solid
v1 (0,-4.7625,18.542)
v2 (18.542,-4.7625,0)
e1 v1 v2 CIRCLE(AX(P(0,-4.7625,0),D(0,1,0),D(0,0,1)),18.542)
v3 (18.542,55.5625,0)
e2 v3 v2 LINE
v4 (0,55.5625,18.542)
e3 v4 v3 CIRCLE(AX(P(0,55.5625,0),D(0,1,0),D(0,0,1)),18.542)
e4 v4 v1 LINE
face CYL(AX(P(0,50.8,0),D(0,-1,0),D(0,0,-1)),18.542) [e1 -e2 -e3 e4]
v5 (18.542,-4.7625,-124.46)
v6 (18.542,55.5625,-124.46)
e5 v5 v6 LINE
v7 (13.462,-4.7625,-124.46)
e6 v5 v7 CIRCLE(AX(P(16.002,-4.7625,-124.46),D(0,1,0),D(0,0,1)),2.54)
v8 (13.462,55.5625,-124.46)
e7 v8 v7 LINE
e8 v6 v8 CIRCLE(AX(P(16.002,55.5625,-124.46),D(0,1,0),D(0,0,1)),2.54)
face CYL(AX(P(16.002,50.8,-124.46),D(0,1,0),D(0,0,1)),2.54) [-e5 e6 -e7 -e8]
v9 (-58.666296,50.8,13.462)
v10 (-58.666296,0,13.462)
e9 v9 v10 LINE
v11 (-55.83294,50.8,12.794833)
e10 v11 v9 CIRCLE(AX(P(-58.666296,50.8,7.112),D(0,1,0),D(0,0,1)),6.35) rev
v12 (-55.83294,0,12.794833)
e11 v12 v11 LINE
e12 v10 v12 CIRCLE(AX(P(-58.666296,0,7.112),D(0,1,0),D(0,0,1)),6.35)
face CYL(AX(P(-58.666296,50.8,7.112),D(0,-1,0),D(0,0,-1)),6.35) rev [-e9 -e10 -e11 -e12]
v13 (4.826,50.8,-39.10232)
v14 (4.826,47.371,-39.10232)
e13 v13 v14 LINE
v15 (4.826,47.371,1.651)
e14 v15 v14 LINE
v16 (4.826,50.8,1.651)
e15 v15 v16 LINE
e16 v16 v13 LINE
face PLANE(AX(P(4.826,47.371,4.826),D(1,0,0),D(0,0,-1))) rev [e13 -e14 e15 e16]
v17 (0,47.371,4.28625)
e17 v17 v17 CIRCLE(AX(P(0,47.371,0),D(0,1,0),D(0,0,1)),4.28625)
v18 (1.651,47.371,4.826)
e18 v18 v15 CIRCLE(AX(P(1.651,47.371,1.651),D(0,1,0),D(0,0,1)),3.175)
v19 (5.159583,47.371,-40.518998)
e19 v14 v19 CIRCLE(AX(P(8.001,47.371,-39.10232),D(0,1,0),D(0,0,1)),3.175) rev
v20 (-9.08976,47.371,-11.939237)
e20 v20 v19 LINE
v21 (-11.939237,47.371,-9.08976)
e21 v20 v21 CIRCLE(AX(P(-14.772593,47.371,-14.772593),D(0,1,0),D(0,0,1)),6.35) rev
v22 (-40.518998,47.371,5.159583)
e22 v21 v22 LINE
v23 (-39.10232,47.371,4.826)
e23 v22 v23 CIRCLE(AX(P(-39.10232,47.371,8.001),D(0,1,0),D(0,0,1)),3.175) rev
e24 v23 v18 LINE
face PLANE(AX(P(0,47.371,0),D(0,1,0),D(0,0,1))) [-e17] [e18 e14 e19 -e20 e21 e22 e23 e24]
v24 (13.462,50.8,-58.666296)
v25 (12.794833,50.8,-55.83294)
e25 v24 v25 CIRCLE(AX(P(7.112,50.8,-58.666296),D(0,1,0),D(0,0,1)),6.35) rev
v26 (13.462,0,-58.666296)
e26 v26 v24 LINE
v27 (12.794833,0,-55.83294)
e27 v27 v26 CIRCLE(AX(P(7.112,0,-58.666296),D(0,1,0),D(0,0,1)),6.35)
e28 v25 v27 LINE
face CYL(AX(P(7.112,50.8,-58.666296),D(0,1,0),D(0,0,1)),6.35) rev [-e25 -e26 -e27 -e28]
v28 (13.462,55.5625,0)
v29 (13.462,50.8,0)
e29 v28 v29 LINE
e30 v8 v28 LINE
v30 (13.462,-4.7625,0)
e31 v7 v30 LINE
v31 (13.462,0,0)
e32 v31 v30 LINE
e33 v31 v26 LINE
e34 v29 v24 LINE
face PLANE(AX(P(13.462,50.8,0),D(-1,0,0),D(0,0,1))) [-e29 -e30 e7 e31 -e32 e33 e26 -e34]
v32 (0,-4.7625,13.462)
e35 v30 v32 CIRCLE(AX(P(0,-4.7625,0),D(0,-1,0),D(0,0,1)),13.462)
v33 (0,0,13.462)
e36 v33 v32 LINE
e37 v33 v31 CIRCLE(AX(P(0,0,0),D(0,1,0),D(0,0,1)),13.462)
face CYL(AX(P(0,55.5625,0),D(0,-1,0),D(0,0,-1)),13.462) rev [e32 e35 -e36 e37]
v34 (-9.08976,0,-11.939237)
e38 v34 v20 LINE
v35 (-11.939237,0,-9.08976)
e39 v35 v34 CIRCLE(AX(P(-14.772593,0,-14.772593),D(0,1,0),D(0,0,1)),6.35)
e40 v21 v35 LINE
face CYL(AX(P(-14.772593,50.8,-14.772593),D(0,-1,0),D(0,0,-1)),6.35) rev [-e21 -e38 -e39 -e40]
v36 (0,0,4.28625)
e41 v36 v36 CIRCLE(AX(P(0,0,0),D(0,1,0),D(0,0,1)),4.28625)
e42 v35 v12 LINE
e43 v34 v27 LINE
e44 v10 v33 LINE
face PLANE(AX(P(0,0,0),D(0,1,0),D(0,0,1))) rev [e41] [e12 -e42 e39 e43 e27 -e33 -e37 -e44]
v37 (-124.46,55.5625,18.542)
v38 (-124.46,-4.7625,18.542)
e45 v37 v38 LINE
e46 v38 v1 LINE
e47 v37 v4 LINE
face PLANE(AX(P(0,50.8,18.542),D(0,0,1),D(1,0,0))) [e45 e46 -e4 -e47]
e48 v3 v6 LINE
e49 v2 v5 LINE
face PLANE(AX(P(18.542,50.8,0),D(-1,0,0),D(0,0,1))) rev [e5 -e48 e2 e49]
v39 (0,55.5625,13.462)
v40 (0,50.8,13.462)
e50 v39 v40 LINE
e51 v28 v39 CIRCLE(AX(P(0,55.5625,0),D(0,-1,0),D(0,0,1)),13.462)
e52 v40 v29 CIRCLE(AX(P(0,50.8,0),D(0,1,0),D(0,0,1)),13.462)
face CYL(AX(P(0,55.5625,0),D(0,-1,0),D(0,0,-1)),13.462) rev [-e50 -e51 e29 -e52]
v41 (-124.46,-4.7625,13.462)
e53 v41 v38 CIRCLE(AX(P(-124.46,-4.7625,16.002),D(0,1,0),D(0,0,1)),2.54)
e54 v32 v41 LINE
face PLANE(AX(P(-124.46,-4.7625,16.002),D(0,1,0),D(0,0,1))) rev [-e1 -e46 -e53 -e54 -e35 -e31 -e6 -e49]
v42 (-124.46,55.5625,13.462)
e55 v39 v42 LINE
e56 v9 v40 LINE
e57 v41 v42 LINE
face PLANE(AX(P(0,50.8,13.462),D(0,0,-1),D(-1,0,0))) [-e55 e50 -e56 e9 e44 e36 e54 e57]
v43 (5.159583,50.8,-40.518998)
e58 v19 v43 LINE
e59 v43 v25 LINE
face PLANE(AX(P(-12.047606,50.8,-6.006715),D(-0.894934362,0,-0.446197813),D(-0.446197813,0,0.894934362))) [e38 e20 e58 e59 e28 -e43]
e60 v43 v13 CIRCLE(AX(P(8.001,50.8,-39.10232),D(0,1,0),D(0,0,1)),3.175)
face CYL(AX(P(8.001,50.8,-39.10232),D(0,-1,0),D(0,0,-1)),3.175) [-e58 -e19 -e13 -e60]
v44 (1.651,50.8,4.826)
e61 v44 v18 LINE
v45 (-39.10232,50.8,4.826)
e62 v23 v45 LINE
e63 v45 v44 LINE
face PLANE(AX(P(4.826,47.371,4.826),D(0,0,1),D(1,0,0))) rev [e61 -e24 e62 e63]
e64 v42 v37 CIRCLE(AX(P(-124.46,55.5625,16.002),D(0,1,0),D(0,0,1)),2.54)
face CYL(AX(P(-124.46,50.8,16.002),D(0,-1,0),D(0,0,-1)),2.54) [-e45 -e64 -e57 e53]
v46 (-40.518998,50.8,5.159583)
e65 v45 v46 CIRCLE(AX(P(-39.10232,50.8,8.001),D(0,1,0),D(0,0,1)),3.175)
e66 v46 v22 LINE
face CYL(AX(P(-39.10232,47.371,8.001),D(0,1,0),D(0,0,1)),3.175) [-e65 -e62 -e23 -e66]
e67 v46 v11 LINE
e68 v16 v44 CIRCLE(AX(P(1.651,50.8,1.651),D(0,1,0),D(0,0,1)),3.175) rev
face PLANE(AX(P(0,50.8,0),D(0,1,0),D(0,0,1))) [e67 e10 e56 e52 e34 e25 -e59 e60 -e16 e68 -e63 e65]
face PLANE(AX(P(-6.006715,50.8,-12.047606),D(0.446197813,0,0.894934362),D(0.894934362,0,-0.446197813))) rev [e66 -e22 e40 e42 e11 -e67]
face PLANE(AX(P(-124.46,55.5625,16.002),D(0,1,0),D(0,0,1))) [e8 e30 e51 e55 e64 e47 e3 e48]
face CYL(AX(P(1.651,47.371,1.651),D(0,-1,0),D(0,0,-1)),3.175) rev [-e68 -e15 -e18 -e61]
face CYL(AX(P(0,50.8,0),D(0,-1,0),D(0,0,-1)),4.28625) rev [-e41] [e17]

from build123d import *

# Parameters (mm, degrees)
SKETCH1_R           = 4.28625
BOSS_EXTRUDE1_DEPTH = 50.8
FILLET2_R           = 2.54
SKETCH7_W           = 44.675933609
SKETCH7_H           = 44.675933609
CUT_EXTRUDE3_DEPTH  = 3.429
FILLET9_R           = 3.175
BOSS_EXTRUDE2_DEPTH = 30.1625
FILLET10_R          = 6.35


with BuildPart() as part:
    # Sketch1 → Boss-Extrude1 (new body)
    with BuildSketch(Plane(origin=(0, 0, 0), x_dir=(1, 0, 0), z_dir=(0, 1, 0))):
        with BuildLine():
            Line((13.462, 57.17106993), (-10.037787665, 10.037787665))
            Line((-10.037787665, 10.037787665), (-57.17106993, -13.462))
            Line((-57.17106993, -13.462), (-127, -13.462))
            Line((-127, -13.462), (-127, -18.542))
            Line((-127, -18.542), (0, -18.542))
            ThreePointArc((0, -18.542), (13.111173937, -13.111173937), (18.542, 0))
            Line((18.542, 0), (18.542, 127))
            Line((18.542, 127), (13.462, 127))
            Line((13.462, 127), (13.462, 57.17106993))
        make_face()
        with Locations(Location((0, 0, 0), (0, 0, 270))):
            Circle(SKETCH1_R, mode=Mode.SUBTRACT)
    extrude(amount=BOSS_EXTRUDE1_DEPTH)

    # Fillet2
    fillet2_edges = [part.edges().sort_by_distance(p)[0] for p in [
        (13.462, 25.4, -127),
        (18.542, 25.4, -127),
        (-127, 25.4, 13.462),
        (-127, 25.4, 18.542),
    ]]
    fillet(fillet2_edges, radius=FILLET2_R - 0.0001)  # a hair under: the kernel refuses the full size

    # Sketch7 → Cut-Extrude3 (cut)
    with BuildSketch(Plane(origin=(0, 50.8, 0), x_dir=(1, 0, 0), z_dir=(0, 1, 0))):
        with Locations((-17.511966805, 17.511966805)):
            Rectangle(SKETCH7_W, SKETCH7_H)
    extrude(amount=-CUT_EXTRUDE3_DEPTH, mode=Mode.SUBTRACT)

    # Fillet9
    fillet9_edges = [part.edges().sort_by_distance(p)[0] for p in [
        (4.826, 49.0855, -39.849933609),
        (4.826, 49.0855, 4.826),
        (-39.849933609, 49.0855, 4.826),
    ]]
    fillet(fillet9_edges, radius=FILLET9_R)

    # Sketch8 → Boss-Extrude2 (add, symmetric)
    with BuildSketch(Plane(origin=(0, 25.4, 0), x_dir=(1, 0, 0), z_dir=(0, 1, 0))):
        with BuildLine():
            Line((0, -13.462), (-124.46, -13.462))
            ThreePointArc((-124.46, -13.462), (-126.256051224, -14.205948776), (-127, -16.002))
            ThreePointArc((-127, -16.002), (-126.256051224, -17.798051224), (-124.46, -18.542))
            Line((-124.46, -18.542), (0, -18.542))
            ThreePointArc((0, -18.542), (13.111173937, -13.111173937), (18.542, 0))
            Line((18.542, 0), (18.542, 124.46))
            ThreePointArc((18.542, 124.46), (17.798051224, 126.256051224), (16.002, 127))
            ThreePointArc((16.002, 127), (14.205948776, 126.256051224), (13.462, 124.46))
            Line((13.462, 124.46), (13.462, 0))
            ThreePointArc((13.462, 0), (9.519071488, -9.519071488), (0, -13.462))
        make_face()
    extrude(amount=BOSS_EXTRUDE2_DEPTH, both=True)

    # Fillet10
    fillet10_edges = [part.edges().sort_by_distance(p)[0] for p in [
        (13.462, 25.4, -57.17106993),
        (-57.17106993, 25.4, 13.462),
        (-10.037787665, 23.6855, -10.037787665),
    ]]
    fillet(fillet10_edges, radius=FILLET10_R)


solid = part.part
